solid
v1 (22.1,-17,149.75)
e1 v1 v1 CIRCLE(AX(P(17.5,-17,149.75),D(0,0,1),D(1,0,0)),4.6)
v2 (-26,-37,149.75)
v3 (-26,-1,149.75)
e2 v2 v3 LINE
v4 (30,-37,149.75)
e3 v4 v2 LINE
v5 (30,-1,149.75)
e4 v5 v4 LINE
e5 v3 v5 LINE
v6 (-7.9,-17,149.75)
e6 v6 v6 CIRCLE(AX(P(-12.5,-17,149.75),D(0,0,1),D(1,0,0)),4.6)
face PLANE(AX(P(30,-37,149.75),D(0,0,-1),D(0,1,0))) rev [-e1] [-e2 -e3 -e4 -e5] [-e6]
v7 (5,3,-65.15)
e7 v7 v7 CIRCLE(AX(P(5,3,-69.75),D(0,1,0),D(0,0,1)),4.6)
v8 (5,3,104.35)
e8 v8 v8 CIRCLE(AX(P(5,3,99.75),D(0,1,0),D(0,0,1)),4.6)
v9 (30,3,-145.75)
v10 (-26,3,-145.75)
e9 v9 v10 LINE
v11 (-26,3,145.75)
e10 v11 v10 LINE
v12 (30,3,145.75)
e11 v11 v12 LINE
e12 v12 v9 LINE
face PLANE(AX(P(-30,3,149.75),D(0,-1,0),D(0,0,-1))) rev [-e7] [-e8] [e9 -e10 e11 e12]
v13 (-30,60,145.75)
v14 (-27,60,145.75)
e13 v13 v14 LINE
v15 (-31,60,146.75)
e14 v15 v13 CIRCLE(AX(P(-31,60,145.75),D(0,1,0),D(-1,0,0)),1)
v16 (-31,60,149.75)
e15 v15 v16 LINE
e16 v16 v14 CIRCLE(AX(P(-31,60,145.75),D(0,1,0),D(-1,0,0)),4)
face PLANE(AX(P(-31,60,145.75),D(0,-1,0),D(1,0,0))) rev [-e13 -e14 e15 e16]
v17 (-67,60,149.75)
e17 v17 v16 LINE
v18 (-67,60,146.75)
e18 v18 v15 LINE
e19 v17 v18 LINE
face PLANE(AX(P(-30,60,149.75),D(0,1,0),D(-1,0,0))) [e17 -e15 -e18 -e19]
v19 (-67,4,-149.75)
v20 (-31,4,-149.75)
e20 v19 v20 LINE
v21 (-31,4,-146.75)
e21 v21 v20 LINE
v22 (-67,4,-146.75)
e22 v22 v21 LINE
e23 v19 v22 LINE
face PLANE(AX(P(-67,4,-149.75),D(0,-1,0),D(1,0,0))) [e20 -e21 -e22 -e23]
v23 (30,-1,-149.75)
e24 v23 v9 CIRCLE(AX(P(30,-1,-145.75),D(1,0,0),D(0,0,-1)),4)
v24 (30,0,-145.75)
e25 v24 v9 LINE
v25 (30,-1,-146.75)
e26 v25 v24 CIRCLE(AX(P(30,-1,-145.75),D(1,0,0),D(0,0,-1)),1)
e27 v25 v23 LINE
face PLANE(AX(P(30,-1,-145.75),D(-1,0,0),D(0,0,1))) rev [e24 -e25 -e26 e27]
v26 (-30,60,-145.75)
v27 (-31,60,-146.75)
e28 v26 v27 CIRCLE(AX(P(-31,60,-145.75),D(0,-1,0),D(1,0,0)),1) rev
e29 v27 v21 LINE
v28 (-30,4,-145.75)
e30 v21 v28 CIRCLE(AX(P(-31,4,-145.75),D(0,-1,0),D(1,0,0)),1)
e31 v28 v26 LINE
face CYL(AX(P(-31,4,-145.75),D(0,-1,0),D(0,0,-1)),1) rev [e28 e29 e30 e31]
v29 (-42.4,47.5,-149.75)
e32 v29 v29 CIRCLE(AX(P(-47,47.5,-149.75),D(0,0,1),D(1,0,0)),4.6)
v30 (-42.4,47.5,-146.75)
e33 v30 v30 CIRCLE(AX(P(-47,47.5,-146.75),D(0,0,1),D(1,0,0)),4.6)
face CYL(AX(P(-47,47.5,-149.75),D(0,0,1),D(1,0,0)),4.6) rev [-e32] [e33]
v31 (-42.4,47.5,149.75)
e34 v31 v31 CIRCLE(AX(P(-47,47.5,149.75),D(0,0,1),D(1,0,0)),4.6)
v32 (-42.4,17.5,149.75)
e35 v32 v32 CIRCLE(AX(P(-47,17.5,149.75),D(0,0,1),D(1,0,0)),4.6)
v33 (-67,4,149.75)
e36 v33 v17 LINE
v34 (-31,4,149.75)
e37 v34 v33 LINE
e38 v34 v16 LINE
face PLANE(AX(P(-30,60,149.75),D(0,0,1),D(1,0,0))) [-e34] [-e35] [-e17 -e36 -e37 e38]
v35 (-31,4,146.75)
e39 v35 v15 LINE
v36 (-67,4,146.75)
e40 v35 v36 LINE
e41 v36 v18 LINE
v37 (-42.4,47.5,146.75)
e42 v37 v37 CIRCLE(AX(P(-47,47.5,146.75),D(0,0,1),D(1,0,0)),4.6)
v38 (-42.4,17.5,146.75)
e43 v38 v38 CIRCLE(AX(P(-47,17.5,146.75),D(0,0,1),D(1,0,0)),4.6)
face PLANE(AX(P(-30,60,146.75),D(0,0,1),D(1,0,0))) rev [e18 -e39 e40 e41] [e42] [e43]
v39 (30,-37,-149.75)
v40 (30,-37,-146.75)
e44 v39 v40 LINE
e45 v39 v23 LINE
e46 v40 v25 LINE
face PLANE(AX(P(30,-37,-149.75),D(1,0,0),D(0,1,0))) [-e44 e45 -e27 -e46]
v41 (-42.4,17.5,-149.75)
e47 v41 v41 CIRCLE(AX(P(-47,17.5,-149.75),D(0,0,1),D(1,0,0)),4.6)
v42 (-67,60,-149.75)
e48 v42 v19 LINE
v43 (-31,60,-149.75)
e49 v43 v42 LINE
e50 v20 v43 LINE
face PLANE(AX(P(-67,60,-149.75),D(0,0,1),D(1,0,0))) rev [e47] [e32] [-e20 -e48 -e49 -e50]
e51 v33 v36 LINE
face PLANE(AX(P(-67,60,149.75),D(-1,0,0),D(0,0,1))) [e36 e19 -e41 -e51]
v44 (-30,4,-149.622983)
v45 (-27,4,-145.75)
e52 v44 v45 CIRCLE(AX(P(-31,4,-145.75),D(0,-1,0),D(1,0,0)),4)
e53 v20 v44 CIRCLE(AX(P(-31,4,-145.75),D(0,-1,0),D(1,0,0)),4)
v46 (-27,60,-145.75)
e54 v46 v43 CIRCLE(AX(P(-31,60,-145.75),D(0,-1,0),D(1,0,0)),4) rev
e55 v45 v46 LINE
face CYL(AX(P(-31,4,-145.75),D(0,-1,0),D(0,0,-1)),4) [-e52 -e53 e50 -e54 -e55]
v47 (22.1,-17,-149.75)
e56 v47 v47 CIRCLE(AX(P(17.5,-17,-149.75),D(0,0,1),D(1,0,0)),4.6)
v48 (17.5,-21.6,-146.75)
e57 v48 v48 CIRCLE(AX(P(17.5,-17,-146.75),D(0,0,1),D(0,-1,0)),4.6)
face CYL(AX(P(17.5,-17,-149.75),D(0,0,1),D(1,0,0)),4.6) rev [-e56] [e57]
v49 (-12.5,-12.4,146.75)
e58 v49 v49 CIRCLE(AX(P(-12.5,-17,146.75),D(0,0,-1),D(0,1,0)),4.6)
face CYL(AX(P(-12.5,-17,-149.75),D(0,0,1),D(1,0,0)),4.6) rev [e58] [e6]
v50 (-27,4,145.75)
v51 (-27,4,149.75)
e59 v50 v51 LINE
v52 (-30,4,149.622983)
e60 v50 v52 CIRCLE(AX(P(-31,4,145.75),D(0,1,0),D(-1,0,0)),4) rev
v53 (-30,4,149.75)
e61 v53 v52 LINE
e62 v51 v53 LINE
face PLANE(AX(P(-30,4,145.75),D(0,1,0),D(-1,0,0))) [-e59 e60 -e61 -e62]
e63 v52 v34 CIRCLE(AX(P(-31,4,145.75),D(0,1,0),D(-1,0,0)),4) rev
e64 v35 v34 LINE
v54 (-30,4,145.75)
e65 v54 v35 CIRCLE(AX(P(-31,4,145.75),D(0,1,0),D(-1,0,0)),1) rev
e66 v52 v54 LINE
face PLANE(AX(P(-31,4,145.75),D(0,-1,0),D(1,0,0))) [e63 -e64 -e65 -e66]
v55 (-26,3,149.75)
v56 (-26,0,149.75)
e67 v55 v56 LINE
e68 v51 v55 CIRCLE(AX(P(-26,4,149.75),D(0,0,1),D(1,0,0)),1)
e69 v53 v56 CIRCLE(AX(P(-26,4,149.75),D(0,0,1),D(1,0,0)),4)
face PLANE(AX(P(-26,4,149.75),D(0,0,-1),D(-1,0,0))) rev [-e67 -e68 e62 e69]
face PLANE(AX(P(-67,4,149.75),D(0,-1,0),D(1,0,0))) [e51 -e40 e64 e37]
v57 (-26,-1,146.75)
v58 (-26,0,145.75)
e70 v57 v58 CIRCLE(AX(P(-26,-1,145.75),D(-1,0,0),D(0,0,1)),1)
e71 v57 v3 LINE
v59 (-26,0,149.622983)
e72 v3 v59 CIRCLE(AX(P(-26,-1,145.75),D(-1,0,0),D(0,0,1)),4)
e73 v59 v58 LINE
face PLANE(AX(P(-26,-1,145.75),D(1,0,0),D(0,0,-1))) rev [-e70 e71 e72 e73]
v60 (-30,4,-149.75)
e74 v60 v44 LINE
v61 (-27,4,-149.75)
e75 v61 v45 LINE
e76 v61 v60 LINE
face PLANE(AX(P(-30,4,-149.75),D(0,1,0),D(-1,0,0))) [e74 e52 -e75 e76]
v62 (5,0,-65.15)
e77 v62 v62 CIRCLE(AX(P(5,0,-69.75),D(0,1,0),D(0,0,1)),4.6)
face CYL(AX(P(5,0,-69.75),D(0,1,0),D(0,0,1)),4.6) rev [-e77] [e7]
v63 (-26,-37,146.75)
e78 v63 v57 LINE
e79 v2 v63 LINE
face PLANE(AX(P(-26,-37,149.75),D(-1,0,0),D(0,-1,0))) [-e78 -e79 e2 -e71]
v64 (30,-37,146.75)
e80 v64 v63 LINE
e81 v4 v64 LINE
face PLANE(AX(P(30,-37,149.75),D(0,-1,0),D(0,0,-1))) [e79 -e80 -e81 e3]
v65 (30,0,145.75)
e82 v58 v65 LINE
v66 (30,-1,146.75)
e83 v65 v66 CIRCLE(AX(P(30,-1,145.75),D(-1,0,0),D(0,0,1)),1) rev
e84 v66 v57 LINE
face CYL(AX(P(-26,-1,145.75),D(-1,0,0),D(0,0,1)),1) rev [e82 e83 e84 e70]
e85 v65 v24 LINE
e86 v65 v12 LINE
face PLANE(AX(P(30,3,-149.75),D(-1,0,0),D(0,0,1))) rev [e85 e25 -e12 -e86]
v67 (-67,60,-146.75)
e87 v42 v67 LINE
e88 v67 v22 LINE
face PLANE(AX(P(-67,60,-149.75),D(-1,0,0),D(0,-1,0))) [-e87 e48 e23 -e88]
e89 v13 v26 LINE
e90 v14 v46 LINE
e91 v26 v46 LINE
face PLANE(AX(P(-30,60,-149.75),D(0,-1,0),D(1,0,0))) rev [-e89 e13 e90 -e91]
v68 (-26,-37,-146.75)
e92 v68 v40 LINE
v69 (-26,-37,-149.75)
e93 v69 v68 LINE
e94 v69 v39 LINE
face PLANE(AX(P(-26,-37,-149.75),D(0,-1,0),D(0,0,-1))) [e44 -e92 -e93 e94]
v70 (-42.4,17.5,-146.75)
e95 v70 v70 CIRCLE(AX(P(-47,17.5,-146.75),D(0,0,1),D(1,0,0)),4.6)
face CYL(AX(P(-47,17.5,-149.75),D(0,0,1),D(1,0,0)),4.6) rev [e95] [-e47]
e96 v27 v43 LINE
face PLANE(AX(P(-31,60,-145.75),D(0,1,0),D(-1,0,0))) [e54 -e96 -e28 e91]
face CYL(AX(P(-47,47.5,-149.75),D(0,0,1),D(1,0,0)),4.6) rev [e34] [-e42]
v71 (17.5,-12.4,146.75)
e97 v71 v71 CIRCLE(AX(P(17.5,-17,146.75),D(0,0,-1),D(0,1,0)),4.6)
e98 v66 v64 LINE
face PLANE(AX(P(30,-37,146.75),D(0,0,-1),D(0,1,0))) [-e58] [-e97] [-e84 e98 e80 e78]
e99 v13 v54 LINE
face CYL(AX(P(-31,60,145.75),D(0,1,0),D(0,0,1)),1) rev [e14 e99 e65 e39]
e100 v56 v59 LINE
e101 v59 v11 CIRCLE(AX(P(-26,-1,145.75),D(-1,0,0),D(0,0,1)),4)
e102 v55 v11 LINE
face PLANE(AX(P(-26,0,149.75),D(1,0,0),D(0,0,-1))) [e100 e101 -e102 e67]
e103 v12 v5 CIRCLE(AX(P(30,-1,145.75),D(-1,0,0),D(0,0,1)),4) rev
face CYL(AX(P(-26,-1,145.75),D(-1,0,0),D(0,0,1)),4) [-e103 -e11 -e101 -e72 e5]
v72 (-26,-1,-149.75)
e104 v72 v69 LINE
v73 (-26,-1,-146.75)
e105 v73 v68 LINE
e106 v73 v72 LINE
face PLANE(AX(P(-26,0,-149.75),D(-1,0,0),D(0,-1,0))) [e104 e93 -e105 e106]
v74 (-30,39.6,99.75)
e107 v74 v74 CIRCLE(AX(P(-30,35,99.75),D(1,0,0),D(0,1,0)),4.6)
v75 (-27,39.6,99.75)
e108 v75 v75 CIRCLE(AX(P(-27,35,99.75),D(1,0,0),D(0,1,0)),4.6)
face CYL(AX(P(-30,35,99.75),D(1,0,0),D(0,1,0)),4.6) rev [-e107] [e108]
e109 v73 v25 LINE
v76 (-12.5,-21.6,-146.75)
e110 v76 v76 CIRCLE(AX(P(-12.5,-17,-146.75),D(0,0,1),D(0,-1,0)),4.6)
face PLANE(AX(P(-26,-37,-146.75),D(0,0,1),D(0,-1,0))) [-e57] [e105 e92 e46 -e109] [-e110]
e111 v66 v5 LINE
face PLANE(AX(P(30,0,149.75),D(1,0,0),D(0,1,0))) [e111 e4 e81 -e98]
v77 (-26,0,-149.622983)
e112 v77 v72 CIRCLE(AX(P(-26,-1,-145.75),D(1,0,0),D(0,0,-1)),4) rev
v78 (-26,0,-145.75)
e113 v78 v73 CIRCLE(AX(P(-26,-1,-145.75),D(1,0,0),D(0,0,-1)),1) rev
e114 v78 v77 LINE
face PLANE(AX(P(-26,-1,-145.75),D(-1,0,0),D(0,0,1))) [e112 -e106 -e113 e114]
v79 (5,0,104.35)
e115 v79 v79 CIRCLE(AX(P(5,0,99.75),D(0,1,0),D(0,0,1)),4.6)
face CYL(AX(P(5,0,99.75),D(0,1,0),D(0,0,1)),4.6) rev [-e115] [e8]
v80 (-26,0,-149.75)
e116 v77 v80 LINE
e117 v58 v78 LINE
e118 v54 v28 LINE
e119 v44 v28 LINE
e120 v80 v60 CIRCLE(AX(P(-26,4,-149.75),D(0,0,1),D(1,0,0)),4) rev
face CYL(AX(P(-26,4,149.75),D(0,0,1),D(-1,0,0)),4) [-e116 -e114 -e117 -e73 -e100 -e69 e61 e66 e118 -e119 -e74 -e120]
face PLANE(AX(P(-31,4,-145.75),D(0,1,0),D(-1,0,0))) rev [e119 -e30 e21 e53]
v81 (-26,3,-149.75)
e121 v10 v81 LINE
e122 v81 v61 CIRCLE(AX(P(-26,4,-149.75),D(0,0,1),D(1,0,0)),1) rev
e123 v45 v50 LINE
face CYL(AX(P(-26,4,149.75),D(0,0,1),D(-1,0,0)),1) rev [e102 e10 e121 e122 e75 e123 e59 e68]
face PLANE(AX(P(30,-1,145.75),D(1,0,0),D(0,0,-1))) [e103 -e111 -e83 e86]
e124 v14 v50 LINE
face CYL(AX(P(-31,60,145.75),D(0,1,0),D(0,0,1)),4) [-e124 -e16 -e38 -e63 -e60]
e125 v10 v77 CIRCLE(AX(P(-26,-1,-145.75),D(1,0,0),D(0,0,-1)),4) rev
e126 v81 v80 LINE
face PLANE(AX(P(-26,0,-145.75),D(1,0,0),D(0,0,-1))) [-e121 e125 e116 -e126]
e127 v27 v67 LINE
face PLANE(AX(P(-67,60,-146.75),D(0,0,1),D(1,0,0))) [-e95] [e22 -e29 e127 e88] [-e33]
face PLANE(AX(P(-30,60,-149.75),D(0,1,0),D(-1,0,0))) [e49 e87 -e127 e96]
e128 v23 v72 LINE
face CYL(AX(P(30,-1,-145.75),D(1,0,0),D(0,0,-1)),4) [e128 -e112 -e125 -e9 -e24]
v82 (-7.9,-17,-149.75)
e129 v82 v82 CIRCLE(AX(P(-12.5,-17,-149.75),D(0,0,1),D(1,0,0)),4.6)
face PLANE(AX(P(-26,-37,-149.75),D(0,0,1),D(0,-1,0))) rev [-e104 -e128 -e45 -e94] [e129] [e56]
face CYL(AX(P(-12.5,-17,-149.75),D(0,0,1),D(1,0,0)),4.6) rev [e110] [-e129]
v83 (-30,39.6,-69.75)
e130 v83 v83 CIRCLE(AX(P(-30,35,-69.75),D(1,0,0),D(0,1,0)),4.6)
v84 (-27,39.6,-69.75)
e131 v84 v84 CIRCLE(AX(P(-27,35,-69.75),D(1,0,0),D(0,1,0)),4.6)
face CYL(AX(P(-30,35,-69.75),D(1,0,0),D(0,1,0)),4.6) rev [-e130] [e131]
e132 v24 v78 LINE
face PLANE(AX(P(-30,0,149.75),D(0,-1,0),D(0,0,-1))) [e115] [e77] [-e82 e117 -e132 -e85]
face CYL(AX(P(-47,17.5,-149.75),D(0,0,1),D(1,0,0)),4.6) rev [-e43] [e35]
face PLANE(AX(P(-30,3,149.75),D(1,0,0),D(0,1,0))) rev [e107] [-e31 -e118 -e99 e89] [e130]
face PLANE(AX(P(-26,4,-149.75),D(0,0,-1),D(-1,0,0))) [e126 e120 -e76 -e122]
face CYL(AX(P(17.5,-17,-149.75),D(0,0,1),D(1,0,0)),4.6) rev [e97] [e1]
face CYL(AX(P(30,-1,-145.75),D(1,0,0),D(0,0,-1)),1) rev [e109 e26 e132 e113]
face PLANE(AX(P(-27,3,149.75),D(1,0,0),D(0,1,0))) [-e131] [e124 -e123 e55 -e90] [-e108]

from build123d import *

# Parameters (mm, degrees)
SKETCH1_W                      = 60
SKETCH1_H                      = 299.5
BASE_FLANGE1_DEPTH             = 3
EDGE_FLANGE1_STRIP_W           = 14
EDGE_FLANGE1_STRIP_H           = 3
EDGE_FLANGE1_STRIP_CUT_DEPTH   = 299.5
EDGE_FLANGE1_DEPTH             = 299.5
EDGE_FLANGE2_STRIP_W           = 14
EDGE_FLANGE2_STRIP_H           = 3
EDGE_FLANGE2_STRIP_CUT_DEPTH   = 56
EDGE_FLANGE2_STRIP_2_W         = 14
EDGE_FLANGE2_STRIP_2_H         = 3
EDGE_FLANGE2_STRIP_CUT_2_DEPTH = 56
EDGE_FLANGE2_STRIP_3_W         = 14
EDGE_FLANGE2_STRIP_3_H         = 3
EDGE_FLANGE2_STRIP_CUT_3_DEPTH = 56
EDGE_FLANGE2_STRIP_4_W         = 14
EDGE_FLANGE2_STRIP_4_H         = 3
EDGE_FLANGE2_STRIP_CUT_4_DEPTH = 56
EDGE_FLANGE2_DEPTH             = 56
EDGE_FLANGE2_BEND_DEPTH        = 56
EDGE_FLANGE2_BEND_2_DEPTH      = 56
EDGE_FLANGE2_BEND_3_DEPTH      = 56
SKETCH18_R                     = 4.6
EXTRUDE1_DEPTH                 = 313.712727595
SKETCH19_R                     = 4.6
EXTRUDE2_DEPTH                 = 3
SKETCH20_R                     = 4.6
EXTRUDE3_DEPTH                 = 3


# Sheet-metal steps are written as plain solids
with BuildPart() as part:
    # Sketch1 → Base-Flange1 (new body)
    with BuildSketch(Plane(origin=(0, 0, 0), x_dir=(1, 0, 0), z_dir=(0, 1, 0))):
        Rectangle(SKETCH1_W, SKETCH1_H)
    extrude(amount=BASE_FLANGE1_DEPTH)

    # Edge-Flange1 strip (across the edge) → Edge-Flange1 strip cut (cut)
    with BuildSketch(Plane(origin=(-30, 3, -149.75), x_dir=(1, 0, 0), z_dir=(0, 0, 1))):
        with Locations((-3, -1.5)):
            Rectangle(EDGE_FLANGE1_STRIP_W, EDGE_FLANGE1_STRIP_H)
    extrude(amount=EDGE_FLANGE1_STRIP_CUT_DEPTH, mode=Mode.SUBTRACT)

    # Edge-Flange1 section (across the edge) → Edge-Flange1 (add)
    with BuildSketch(Plane(origin=(-30, 3, -149.75), x_dir=(1, 0, 0), z_dir=(0, 0, 1))):
        with BuildLine():
            Line((0, 1), (0, 57))
            Line((0, 57), (3, 57))
            Line((3, 57), (3, 1))
            ThreePointArc((3, 1), (3.292893219, 0.292893219), (4, 0))
            Line((4, 0), (4, -3))
            ThreePointArc((4, -3), (1.171572875, -1.828427125), (0, 1))
        make_face()
    extrude(amount=EDGE_FLANGE1_DEPTH)

    # Edge-Flange2 strip (across the edge) → Edge-Flange2 strip cut (cut)
    with BuildSketch(Plane(origin=(-30, 4, 149.75), x_dir=(0, 0, -1), z_dir=(0, 1, 0))):
        with Locations((-3, -1.5)):
            Rectangle(EDGE_FLANGE2_STRIP_W, EDGE_FLANGE2_STRIP_H)
    extrude(amount=EDGE_FLANGE2_STRIP_CUT_DEPTH, mode=Mode.SUBTRACT)

    # Edge-Flange2 strip 2 (across the edge) → Edge-Flange2 strip cut 2 (cut)
    with BuildSketch(Plane(origin=(30, 0, 149.75), x_dir=(0, 0, -1), z_dir=(-1, 0, 0))):
        with Locations((-3, -1.5)):
            Rectangle(EDGE_FLANGE2_STRIP_2_W, EDGE_FLANGE2_STRIP_2_H)
    extrude(amount=EDGE_FLANGE2_STRIP_CUT_2_DEPTH, mode=Mode.SUBTRACT)

    # Edge-Flange2 strip 3 (across the edge) → Edge-Flange2 strip cut 3 (cut)
    with BuildSketch(Plane(origin=(-30, 60, -149.75), x_dir=(0, 0, 1), z_dir=(0, -1, 0))):
        with Locations((-3, -1.5)):
            Rectangle(EDGE_FLANGE2_STRIP_3_W, EDGE_FLANGE2_STRIP_3_H)
    extrude(amount=EDGE_FLANGE2_STRIP_CUT_3_DEPTH, mode=Mode.SUBTRACT)

    # Edge-Flange2 strip 4 (across the edge) → Edge-Flange2 strip cut 4 (cut)
    with BuildSketch(Plane(origin=(-26, 0, -149.75), x_dir=(0, 0, 1), z_dir=(1, 0, 0))):
        with Locations((-3, -1.5)):
            Rectangle(EDGE_FLANGE2_STRIP_4_W, EDGE_FLANGE2_STRIP_4_H)
    extrude(amount=EDGE_FLANGE2_STRIP_CUT_4_DEPTH, mode=Mode.SUBTRACT)

    # Edge-Flange2 section (across the edge) → Edge-Flange2 (add)
    with BuildSketch(Plane(origin=(-30, 4, 149.75), x_dir=(0, 0, -1), z_dir=(0, 1, 0))):
        with BuildLine():
            Line((0, 1), (0, 37))
            Line((0, 37), (3, 37))
            Line((3, 37), (3, 1))
            ThreePointArc((3, 1), (3.292893219, 0.292893219), (4, 0))
            Line((4, 0), (4, -3))
            ThreePointArc((4, -3), (1.171572875, -1.828427125), (0, 1))
        make_face()
    extrude(amount=EDGE_FLANGE2_DEPTH)

    # Edge-Flange2 section 2 (across the edge) → Edge-Flange2 bend (add)
    with BuildSketch(Plane(origin=(30, 0, 149.75), x_dir=(0, 0, -1), z_dir=(-1, 0, 0))):
        with BuildLine():
            Line((0, 1), (0, 37))
            Line((0, 37), (3, 37))
            Line((3, 37), (3, 1))
            ThreePointArc((3, 1), (3.292893219, 0.292893219), (4, 0))
            Line((4, 0), (4, -3))
            ThreePointArc((4, -3), (1.171572875, -1.828427125), (0, 1))
        make_face()
    extrude(amount=EDGE_FLANGE2_BEND_DEPTH)

    # Edge-Flange2 section 3 (across the edge) → Edge-Flange2 bend 2 (add)
    with BuildSketch(Plane(origin=(-30, 60, -149.75), x_dir=(0, 0, 1), z_dir=(0, -1, 0))):
        with BuildLine():
            Line((0, 1), (0, 37))
            Line((0, 37), (3, 37))
            Line((3, 37), (3, 1))
            ThreePointArc((3, 1), (3.292893219, 0.292893219), (4, 0))
            Line((4, 0), (4, -3))
            ThreePointArc((4, -3), (1.171572875, -1.828427125), (0, 1))
        make_face()
    extrude(amount=EDGE_FLANGE2_BEND_2_DEPTH)

    # Edge-Flange2 section 4 (across the edge) → Edge-Flange2 bend 3 (add)
    with BuildSketch(Plane(origin=(-26, 0, -149.75), x_dir=(0, 0, 1), z_dir=(1, 0, 0))):
        with BuildLine():
            Line((0, 1), (0, 37))
            Line((0, 37), (3, 37))
            Line((3, 37), (3, 1))
            ThreePointArc((3, 1), (3.292893219, 0.292893219), (4, 0))
            Line((4, 0), (4, -3))
            ThreePointArc((4, -3), (1.171572875, -1.828427125), (0, 1))
        make_face()
    extrude(amount=EDGE_FLANGE2_BEND_3_DEPTH)

    # Sketch18 → Extrude1 (cut, through all)
    with BuildSketch(Plane.XY.offset(149.75)):
        with Locations((-47, 47.5)):
            Circle(SKETCH18_R)
        with Locations((-47, 17.5)):
            Circle(SKETCH18_R)
        with Locations((-12.5, -17)):
            Circle(SKETCH18_R)
        with Locations((17.5, -17)):
            Circle(SKETCH18_R)
    extrude(amount=-EXTRUDE1_DEPTH, mode=Mode.SUBTRACT)

    # Sketch19 → Extrude2 (cut)
    with BuildSketch(Plane(origin=(-27, 0, 0), x_dir=(0, 0, -1), z_dir=(1, 0, 0))):
        with Locations(Location((-99.75, 35, 0), (0, 0, 90))):
            Circle(SKETCH19_R)
        with Locations(Location((69.75, 35, 0), (0, 0, 90))):
            Circle(SKETCH19_R)
    extrude(amount=-EXTRUDE2_DEPTH, mode=Mode.SUBTRACT)

    # Sketch20 → Extrude3 (cut)
    with BuildSketch(Plane(origin=(0, 3, 0), x_dir=(1, 0, 0), z_dir=(0, 1, 0))):
        with Locations(Location((5, 69.75, 0), (0, 0, 270))):
            Circle(SKETCH20_R)
        with Locations(Location((5, -99.75, 0), (0, 0, 270))):
            Circle(SKETCH20_R)
    extrude(amount=-EXTRUDE3_DEPTH, mode=Mode.SUBTRACT)


solid = part.part
